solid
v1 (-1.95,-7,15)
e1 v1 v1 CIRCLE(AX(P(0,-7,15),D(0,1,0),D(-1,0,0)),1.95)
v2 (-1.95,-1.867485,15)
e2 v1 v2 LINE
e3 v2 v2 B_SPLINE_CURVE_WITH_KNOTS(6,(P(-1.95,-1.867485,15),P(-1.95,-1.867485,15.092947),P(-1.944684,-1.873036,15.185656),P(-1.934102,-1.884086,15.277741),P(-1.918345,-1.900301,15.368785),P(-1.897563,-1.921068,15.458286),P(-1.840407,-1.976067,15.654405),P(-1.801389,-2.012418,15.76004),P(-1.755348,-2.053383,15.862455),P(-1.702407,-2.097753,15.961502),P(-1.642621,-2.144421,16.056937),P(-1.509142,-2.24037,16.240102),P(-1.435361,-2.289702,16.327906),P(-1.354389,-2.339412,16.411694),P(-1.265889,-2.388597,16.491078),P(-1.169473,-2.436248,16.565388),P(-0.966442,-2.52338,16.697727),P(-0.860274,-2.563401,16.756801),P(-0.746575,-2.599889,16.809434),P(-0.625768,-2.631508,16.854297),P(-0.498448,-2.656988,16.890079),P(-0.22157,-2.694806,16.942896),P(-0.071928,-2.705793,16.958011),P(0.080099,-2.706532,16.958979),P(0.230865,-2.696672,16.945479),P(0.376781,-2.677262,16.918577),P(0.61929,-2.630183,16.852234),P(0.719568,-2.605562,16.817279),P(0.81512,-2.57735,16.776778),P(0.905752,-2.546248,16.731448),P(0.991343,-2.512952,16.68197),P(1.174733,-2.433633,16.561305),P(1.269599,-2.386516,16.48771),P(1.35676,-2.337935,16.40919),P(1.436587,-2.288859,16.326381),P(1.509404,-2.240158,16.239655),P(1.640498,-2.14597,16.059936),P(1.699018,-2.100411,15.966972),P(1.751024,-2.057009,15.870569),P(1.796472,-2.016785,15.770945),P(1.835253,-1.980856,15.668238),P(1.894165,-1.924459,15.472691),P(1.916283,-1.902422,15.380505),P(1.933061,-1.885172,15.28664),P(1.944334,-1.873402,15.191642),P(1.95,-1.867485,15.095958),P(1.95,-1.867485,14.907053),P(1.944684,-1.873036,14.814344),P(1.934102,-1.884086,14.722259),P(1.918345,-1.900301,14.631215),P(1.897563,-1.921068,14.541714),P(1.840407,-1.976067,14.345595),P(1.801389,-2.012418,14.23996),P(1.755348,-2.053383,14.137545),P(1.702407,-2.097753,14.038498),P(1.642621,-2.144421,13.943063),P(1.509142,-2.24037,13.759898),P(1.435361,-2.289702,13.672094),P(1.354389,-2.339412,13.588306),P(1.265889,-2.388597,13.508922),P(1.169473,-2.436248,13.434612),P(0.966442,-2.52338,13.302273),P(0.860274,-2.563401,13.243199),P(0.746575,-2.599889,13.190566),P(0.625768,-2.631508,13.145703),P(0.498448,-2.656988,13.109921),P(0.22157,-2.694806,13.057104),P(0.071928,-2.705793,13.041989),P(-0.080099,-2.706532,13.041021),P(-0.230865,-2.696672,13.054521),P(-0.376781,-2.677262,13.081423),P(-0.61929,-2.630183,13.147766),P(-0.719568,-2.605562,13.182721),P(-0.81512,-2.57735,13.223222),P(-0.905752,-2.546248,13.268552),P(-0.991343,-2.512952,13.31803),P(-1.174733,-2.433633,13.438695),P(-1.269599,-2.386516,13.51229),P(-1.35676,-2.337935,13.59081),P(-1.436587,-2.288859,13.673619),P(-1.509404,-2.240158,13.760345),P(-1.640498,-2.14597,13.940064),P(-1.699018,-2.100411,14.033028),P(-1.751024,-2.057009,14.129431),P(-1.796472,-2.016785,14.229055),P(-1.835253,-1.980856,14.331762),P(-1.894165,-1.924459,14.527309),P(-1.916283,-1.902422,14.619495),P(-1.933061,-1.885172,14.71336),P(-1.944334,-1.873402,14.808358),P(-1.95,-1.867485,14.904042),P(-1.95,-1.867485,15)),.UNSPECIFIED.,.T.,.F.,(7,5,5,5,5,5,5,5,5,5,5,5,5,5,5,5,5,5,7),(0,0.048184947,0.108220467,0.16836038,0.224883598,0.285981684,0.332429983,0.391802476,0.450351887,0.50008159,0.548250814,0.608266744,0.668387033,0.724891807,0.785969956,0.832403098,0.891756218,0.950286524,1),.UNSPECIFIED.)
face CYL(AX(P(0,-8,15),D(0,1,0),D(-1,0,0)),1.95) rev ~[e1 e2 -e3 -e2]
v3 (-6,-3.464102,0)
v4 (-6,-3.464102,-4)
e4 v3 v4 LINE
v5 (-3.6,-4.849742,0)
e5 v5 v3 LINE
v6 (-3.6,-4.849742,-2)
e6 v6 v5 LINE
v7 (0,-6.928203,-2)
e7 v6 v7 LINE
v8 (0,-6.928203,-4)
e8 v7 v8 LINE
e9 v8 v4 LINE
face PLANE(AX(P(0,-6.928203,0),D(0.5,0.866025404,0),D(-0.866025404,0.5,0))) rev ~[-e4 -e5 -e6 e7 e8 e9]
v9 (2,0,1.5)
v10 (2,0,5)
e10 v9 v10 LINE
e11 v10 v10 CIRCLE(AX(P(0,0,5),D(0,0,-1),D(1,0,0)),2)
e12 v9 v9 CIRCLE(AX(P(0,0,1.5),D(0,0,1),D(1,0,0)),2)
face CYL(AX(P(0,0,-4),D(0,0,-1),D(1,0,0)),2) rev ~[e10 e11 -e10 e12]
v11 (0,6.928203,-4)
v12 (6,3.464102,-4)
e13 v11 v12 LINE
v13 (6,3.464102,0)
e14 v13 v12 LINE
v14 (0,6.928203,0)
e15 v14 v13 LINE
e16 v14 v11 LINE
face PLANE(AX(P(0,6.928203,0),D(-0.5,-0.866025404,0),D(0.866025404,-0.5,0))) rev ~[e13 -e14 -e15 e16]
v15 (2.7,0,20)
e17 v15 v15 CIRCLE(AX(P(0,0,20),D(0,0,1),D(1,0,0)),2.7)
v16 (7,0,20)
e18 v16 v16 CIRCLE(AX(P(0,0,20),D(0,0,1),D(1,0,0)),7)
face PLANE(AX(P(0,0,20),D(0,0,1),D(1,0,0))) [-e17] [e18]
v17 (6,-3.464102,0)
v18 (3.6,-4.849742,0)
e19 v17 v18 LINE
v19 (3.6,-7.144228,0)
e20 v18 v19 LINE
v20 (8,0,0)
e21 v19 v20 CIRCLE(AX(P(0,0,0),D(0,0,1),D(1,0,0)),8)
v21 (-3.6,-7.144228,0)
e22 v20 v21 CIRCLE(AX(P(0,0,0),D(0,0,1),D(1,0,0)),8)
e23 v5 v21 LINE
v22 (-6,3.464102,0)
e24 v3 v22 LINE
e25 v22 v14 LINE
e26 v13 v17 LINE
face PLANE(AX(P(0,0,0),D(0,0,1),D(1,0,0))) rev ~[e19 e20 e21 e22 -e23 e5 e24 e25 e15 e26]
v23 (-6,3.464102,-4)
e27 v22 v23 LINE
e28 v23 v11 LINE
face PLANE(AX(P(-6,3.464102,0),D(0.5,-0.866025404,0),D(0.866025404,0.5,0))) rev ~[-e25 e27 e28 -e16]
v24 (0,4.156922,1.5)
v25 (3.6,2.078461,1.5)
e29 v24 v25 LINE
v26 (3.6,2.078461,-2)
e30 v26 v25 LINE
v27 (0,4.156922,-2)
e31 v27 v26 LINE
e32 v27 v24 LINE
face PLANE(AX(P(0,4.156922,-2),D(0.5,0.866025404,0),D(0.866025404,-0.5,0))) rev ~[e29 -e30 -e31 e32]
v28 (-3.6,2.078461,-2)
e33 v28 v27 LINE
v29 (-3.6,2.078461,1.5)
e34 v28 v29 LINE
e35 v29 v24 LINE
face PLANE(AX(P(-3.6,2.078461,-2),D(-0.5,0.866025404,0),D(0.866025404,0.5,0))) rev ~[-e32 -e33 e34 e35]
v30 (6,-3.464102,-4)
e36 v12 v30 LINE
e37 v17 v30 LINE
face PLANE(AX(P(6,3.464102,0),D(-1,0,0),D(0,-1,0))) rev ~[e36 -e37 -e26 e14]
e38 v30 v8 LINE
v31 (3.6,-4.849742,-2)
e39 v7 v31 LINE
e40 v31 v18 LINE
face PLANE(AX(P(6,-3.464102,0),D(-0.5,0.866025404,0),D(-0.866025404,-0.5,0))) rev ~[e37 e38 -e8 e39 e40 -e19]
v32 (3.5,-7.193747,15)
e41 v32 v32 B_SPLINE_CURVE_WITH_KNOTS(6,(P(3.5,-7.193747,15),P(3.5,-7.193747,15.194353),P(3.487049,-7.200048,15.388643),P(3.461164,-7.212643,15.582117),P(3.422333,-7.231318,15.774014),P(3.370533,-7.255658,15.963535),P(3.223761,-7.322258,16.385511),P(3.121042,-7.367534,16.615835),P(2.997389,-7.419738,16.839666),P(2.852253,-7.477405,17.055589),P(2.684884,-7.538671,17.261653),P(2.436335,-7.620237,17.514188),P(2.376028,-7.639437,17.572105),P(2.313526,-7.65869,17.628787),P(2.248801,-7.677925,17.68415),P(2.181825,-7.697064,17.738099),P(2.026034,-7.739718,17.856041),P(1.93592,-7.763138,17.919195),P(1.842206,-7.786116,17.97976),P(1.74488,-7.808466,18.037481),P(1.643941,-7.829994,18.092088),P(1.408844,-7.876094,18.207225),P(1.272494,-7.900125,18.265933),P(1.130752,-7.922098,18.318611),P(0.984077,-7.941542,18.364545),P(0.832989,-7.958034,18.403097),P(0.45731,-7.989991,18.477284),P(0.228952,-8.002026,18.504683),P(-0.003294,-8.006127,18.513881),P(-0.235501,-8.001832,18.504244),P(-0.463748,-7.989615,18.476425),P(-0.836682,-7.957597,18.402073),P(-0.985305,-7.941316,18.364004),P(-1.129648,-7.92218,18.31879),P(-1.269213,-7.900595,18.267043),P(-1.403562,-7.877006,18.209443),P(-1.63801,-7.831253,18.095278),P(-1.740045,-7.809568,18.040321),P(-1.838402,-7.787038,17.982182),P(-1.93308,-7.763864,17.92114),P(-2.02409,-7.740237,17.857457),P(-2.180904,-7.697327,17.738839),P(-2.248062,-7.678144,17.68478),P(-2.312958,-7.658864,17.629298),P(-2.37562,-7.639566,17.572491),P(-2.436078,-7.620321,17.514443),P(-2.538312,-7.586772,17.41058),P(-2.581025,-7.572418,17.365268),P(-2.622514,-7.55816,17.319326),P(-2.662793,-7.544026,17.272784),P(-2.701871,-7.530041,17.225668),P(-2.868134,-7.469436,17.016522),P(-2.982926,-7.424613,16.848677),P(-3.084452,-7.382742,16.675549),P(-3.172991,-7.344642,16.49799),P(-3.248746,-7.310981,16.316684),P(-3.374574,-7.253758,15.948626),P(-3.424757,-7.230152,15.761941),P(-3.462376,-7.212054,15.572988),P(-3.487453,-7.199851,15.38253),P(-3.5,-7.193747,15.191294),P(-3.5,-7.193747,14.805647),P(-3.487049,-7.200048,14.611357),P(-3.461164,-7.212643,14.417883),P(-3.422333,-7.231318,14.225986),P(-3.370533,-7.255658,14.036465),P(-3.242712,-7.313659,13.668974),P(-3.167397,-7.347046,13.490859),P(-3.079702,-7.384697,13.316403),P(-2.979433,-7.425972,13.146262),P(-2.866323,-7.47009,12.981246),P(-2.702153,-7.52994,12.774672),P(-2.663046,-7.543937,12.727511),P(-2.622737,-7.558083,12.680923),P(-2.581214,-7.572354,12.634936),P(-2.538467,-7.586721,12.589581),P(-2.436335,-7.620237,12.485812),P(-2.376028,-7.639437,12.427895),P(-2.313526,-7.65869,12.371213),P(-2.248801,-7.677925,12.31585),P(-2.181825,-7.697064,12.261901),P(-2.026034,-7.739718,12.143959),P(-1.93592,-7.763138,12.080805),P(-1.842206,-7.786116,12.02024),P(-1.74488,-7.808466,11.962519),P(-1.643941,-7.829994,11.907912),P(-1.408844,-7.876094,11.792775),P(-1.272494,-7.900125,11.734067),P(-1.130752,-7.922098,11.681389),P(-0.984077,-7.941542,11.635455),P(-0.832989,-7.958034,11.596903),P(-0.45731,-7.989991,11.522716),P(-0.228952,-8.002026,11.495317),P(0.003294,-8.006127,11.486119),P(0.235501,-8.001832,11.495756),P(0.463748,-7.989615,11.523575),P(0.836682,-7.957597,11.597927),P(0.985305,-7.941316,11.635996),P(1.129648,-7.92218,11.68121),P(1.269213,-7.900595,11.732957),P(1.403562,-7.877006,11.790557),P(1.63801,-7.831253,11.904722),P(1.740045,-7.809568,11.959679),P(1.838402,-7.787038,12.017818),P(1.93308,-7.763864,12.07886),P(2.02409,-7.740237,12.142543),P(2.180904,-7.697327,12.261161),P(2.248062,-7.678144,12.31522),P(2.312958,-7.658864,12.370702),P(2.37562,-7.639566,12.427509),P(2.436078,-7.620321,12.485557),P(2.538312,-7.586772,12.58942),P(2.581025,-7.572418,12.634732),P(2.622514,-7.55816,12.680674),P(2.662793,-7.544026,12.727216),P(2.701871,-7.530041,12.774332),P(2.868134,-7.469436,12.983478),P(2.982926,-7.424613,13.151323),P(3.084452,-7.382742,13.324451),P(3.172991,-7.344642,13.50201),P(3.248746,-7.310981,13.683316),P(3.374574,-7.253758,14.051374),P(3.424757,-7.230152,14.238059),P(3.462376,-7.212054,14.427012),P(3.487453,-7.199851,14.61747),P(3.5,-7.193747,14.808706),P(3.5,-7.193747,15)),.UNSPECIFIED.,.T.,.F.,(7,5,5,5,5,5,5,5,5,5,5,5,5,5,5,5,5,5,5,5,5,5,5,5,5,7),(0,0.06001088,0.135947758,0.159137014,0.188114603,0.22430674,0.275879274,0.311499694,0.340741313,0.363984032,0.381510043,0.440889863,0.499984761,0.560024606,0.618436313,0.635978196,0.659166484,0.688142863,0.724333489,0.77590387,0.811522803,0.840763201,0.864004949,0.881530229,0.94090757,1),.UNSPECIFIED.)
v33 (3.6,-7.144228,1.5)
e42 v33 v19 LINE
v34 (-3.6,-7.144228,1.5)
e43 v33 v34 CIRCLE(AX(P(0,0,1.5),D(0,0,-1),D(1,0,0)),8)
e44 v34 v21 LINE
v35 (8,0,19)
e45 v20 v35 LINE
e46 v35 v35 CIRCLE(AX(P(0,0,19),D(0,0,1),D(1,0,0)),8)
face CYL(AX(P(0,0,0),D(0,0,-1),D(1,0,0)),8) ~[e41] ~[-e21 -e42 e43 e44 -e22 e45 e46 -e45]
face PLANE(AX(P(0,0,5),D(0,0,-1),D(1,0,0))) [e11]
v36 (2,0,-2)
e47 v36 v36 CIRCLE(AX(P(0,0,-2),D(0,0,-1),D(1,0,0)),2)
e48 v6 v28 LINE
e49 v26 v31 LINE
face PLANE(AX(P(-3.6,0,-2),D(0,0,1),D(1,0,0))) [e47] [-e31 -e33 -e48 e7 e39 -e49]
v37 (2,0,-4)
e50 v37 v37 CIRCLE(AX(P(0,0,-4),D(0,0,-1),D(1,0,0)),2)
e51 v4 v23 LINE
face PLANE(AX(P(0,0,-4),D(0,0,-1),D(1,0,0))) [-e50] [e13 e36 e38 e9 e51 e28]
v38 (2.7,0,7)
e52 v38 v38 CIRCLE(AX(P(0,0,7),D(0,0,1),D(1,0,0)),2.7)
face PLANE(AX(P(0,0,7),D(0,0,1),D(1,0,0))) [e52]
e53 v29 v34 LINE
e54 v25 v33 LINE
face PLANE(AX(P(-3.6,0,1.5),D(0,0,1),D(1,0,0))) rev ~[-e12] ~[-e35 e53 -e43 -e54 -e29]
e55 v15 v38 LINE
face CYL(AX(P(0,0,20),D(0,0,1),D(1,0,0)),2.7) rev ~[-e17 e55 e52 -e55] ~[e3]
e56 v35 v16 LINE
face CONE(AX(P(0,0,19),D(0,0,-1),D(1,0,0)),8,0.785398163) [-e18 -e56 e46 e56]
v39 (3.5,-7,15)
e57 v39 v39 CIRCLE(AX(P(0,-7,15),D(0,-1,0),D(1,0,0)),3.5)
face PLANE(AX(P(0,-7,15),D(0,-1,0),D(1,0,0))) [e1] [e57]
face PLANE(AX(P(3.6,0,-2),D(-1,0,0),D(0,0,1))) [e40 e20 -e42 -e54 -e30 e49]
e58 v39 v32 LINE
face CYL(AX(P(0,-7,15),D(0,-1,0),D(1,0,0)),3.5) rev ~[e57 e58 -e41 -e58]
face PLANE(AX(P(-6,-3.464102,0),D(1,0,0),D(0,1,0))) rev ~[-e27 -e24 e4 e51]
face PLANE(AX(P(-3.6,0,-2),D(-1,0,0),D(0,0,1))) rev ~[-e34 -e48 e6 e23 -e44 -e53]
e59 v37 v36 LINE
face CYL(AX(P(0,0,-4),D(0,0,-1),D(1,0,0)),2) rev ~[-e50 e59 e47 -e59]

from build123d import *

# Parameters (mm, degrees)
F1_R            = 8
F2_DEPTH        = 20
F4_DEPTH        = 4
F5_R            = 2
F6_DEPTH        = 9
F9_DEPTH        = 3.5
F10_W           = 7.2
F10_H           = 3.5
F11_DEPTH       = 9
F12_SIZE        = 1
F13_R           = 2.7
F14_DEPTH       = 13
F17_D           = 3.9
F17_DEPTH       = 9
F17_CBORE_D     = 7
F17_CBORE_DEPTH = 1
F17_TIP         = 1.1716782071


with BuildPart() as f2:
    # F1 (on Top) → F2 (new body)
    with BuildSketch(Plane.XY):
        Circle(F1_R)
    extrude(amount=F2_DEPTH)

    # F3 (on face) → F4 (join)
    with BuildSketch(Plane(origin=(0, 0, 0), x_dir=(1, 0, 0), z_dir=(0, 0, -1))):
        Polygon((-6, 3.4641016151), (-6, -3.4641016151), (0, -6.9282032303), (6, -3.4641016151), (6, 3.4641016151), (0, 6.9282032303), align=None)
    extrude(amount=F4_DEPTH)

    # F5 (on face) → F6 (cut)
    with BuildSketch(Plane(origin=(0, 0, -4), x_dir=(1, 0, 0), z_dir=(0, 0, -1))):
        Circle(F5_R)
    extrude(amount=-F6_DEPTH, mode=Mode.SUBTRACT)

    # F8 (on offset) → F9 (cut)
    with BuildSketch(Plane(origin=(0, 0, -2), x_dir=(1, 0, 0), z_dir=(0, 0, -1))):
        Polygon((3.6, -2.0784609691), (3.6, 2.0784609691), (0, 4.1569219382), (-3.6, 2.0784609691), (-3.6, -2.0784609691), (0, -4.1569219382), align=None)
    extrude(amount=-F9_DEPTH, mode=Mode.SUBTRACT)

    # F10 (on Front) → F11 (cut)
    with BuildSketch(Plane.XZ):
        with Locations((0, -0.25)):
            Rectangle(F10_W, F10_H)
    extrude(amount=F11_DEPTH, mode=Mode.SUBTRACT)

    # F12
    f12_edges = [f2.edges().sort_by_distance(p)[0] for p in [
        (-8, 0, 20),
    ]]
    chamfer(f12_edges, length=F12_SIZE)

    # F13 (on face) → F14 (cut)
    with BuildSketch(Plane.XY.offset(20)):
        Circle(F13_R)
    extrude(amount=-F14_DEPTH, mode=Mode.SUBTRACT)

    # F17
    with Locations(Plane.XZ.offset(8)):
        with Locations((0, 15)):
            CounterBoreHole(F17_D / 2, F17_CBORE_D / 2, F17_CBORE_DEPTH, depth=F17_DEPTH)
            with Locations((0, 0, -(F17_DEPTH + F17_TIP / 2))):  # 118° drill point
                Cone(0, F17_D / 2, F17_TIP, mode=Mode.SUBTRACT)


solid = f2.part
